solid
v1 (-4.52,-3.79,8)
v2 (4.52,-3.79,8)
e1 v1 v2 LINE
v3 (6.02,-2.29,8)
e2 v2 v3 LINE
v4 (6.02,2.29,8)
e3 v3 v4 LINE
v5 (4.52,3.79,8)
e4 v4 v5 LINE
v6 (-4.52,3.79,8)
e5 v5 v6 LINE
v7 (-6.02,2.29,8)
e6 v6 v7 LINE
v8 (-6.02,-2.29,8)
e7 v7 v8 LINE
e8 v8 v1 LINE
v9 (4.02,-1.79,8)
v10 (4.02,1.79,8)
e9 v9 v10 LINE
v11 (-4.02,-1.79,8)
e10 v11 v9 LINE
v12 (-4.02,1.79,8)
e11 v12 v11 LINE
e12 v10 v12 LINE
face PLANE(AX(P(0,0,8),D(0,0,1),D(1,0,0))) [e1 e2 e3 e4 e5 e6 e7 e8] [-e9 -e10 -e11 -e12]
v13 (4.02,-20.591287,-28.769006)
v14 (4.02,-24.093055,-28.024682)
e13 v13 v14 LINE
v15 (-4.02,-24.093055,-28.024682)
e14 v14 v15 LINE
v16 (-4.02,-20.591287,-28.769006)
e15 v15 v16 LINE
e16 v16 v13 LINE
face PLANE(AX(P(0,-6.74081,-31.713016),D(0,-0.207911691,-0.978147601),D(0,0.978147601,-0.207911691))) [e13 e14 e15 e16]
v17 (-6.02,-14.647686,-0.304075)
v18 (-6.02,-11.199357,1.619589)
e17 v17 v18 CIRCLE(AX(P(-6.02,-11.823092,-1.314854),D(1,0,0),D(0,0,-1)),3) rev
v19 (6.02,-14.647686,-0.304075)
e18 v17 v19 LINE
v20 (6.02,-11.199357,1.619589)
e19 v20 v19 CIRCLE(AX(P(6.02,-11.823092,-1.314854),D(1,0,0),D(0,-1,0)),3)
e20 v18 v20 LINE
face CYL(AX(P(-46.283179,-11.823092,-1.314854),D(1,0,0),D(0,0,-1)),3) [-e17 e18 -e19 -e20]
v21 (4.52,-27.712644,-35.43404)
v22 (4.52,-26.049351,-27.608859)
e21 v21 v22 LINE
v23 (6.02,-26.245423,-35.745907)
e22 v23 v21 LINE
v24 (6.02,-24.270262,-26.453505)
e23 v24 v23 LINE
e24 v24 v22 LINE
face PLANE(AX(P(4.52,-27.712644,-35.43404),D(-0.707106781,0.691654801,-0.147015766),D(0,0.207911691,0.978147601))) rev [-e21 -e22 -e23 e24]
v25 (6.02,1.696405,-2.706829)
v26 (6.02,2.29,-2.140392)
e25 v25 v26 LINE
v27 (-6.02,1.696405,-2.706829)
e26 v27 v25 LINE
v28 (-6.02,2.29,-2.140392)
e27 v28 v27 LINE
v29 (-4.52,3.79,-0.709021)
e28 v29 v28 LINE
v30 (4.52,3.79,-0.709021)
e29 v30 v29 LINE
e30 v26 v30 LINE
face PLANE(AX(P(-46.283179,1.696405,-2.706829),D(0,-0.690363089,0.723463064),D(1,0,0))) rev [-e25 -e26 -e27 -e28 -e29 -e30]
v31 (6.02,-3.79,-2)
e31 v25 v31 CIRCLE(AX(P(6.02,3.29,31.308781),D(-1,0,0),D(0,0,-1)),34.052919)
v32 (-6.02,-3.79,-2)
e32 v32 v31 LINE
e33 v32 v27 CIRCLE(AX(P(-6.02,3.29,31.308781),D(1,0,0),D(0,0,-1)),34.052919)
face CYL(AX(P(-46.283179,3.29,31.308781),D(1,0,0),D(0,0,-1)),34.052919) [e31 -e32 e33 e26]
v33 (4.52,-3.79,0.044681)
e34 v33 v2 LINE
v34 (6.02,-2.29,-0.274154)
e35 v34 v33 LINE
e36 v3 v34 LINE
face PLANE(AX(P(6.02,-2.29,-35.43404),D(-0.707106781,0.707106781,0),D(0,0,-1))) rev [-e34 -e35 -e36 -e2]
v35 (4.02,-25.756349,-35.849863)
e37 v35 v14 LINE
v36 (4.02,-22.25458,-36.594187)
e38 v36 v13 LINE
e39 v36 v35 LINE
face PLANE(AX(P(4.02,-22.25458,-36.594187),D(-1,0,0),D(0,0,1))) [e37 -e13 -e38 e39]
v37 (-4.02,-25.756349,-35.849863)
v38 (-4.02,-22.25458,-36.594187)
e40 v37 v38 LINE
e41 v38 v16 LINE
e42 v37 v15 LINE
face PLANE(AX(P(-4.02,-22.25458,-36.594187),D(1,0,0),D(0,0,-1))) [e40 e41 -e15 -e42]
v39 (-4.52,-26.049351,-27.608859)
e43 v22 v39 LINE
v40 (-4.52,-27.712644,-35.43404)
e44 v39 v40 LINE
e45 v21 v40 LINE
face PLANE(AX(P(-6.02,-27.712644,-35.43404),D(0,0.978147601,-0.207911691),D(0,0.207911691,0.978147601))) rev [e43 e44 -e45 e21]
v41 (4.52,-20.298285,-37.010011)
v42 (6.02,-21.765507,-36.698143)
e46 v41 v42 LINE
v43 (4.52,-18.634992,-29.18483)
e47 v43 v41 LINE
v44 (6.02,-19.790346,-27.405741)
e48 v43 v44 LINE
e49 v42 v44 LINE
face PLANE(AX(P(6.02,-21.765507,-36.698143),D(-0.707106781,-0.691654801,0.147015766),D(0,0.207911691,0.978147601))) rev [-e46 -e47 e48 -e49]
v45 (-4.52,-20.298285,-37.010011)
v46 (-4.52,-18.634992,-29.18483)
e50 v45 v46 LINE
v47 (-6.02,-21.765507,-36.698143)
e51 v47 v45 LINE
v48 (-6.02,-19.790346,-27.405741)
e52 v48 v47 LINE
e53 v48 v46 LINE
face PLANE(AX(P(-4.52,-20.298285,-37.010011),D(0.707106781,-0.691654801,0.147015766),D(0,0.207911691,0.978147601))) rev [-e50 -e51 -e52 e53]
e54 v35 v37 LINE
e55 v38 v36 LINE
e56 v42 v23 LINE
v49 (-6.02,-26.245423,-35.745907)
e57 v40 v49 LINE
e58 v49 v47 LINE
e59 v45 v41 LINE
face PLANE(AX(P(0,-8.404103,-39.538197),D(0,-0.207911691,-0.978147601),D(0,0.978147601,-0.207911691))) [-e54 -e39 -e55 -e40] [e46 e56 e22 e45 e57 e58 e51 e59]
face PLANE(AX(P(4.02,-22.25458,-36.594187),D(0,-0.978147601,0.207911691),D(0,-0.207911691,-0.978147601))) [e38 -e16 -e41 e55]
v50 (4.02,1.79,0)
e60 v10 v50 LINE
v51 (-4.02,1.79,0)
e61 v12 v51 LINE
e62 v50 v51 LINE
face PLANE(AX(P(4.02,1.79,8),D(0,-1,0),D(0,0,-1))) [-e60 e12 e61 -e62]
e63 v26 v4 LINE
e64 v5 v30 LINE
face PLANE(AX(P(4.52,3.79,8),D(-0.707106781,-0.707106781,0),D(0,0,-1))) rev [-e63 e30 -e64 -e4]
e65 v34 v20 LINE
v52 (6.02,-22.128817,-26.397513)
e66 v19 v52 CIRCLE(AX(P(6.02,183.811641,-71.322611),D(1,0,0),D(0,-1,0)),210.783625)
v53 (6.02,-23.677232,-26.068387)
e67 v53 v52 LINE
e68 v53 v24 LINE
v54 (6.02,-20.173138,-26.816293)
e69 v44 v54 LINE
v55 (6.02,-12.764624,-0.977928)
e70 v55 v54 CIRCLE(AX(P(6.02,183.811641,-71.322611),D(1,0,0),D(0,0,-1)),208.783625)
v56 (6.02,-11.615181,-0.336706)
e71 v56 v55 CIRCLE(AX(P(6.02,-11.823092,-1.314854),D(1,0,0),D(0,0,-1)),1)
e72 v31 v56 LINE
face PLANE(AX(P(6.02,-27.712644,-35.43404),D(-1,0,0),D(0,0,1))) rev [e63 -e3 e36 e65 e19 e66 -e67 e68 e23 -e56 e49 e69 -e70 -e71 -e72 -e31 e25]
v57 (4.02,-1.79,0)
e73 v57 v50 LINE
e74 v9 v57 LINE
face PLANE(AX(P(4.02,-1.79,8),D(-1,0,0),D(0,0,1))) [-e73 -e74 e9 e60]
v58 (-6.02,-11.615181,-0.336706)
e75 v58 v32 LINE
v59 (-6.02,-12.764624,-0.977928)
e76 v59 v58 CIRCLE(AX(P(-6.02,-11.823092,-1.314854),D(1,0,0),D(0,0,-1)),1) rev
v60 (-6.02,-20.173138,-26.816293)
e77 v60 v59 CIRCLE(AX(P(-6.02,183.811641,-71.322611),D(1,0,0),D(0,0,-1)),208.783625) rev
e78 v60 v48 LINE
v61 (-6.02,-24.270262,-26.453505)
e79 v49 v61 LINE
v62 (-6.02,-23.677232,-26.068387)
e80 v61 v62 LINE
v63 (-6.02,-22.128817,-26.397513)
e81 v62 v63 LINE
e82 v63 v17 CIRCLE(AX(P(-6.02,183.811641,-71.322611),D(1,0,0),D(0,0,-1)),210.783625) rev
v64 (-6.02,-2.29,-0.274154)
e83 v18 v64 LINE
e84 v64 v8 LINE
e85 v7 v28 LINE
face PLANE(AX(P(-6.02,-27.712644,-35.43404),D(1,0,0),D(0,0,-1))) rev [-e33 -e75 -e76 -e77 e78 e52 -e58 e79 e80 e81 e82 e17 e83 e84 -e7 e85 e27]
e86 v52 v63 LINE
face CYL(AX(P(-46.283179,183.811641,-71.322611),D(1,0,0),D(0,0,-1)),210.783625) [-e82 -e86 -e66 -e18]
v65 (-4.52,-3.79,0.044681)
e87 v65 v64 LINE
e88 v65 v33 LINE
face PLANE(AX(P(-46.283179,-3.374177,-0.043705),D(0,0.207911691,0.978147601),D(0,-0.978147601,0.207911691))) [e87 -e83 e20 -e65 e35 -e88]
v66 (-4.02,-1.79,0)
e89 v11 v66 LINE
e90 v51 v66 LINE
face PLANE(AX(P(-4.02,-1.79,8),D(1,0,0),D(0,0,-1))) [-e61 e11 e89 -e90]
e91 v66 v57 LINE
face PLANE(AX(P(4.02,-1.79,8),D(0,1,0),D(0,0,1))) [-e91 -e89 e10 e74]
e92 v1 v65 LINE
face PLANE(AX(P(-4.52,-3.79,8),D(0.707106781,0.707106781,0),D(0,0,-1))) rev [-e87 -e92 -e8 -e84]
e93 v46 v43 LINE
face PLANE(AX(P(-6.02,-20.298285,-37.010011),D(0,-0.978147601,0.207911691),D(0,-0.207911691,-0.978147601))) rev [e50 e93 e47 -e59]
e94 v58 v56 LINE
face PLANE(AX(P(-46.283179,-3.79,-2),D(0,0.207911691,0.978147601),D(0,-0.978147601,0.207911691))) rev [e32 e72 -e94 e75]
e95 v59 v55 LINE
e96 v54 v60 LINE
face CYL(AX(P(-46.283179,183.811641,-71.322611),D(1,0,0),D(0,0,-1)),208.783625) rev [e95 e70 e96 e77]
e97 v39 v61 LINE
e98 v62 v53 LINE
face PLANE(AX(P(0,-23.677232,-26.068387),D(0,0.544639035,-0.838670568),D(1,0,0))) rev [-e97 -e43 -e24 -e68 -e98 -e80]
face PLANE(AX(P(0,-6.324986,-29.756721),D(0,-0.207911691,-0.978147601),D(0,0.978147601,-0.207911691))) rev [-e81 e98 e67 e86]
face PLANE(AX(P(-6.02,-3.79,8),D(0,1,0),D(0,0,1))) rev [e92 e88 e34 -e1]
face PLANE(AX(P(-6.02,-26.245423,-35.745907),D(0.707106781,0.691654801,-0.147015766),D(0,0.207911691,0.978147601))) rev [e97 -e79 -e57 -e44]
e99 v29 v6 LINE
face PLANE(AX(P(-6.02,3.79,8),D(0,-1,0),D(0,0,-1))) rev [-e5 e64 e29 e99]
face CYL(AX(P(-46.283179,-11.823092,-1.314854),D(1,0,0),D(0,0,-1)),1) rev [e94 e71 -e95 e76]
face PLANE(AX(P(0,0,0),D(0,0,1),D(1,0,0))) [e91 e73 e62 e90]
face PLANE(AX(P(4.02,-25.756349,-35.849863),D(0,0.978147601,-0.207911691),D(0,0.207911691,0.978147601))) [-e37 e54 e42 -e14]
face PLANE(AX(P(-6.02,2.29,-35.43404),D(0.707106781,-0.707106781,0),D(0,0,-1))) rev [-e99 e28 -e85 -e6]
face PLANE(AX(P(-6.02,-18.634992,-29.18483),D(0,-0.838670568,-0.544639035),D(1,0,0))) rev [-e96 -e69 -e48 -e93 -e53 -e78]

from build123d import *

# Parameters (mm, degrees)
SKETCH1_W           = 12.04
SKETCH1_H           = 7.58
SKETCH1_W_2         = 8.04
SKETCH1_H_2         = 3.58
BOSS_EXTRUDE1_DEPTH = 8
SKETCH1_2_W         = 12.04
SKETCH1_2_H         = 7.58
SKETCH1_2_W_2       = 8.04
SKETCH1_2_H_2       = 3.58
BOSS_EXTRUDE2_DEPTH = 2
EXTRUDE_THIN1_DEPTH = 12.04
SKETCH5_W           = 12.04
SKETCH5_H           = 7.58
SKETCH5_W_2         = 8.04
SKETCH5_H_2         = 3.58
BOSS_EXTRUDE4_DEPTH = 8
SKETCH5_4_W         = 12.04
SKETCH5_4_H         = 7.58
BOSS_EXTRUDE5_DEPTH = 2
CHAMFER1_SIZE       = 1.5
CHAMFER2_START      = -7
CHAMFER2_DEPTH      = 14


with BuildPart() as part:
    # Sketch1 → Boss-Extrude1 (new body)
    with BuildSketch(Plane.XY):
        Rectangle(SKETCH1_W, SKETCH1_H)
        Rectangle(SKETCH1_W_2, SKETCH1_H_2, mode=Mode.SUBTRACT)
    extrude(amount=BOSS_EXTRUDE1_DEPTH)

    # Sketch1<2> → Boss-Extrude2 (add)
    # profile 1 of 2: a face of its own
    with BuildSketch(Plane.XY):
        Rectangle(SKETCH1_2_W, SKETCH1_2_H)
        Rectangle(SKETCH1_2_W_2, SKETCH1_2_H_2, mode=Mode.SUBTRACT)
    # profile 2 of 2: a face of its own
    with BuildSketch(Plane.XY):
        Rectangle(SKETCH1_2_W_2, SKETCH1_2_H_2)
    extrude(amount=-BOSS_EXTRUDE2_DEPTH)

    # Sketch3 → Extrude-Thin1 (add)
    with BuildSketch(Plane(origin=(6.02, 9.81, 0), x_dir=(0, -1, 0), z_dir=(1, 0, 0))):
        with BuildLine():
            Line((6.02, 2.744137986), (6.52, 2.744137986))
            ThreePointArc((6.52, 2.744137986), (10.07949931, 2.557592532), (13.6, 2))
            Line((13.6, 2), (21.425180806, 0.336706473))
            ThreePointArc((21.425180806, 0.336706473), (22.120268588, 0.441550315), (22.574623539, 0.977927827))
            ThreePointArc((22.574623539, 0.977927827), (26.849152106, 14.317688881), (30.219561316, 27.914054616))
            Line((30.219561316, 27.914054616), (30.401286915, 28.769006338))
            Line((30.401286915, 28.769006338), (32.357582116, 28.353182957))
            Line((32.357582116, 28.353182957), (32.175856518, 27.498231234))
            ThreePointArc((32.175856518, 27.498231234), (28.773161162, 13.771621897), (24.457685624, 0.304075332))
            ThreePointArc((24.457685624, 0.304075332), (23.094620772, -1.305057203), (21.009357424, -1.619588728))
            Line((21.009357424, -1.619588728), (13.184176618, 0.043704799))
            ThreePointArc((13.184176618, 0.043704799), (9.870442383, 0.568548741), (6.52, 0.744137986))
            Line((6.52, 0.744137986), (6.02, 0.744137986))
            Line((6.02, 0.744137986), (6.02, 2.744137986))
        make_face()
    extrude(amount=-EXTRUDE_THIN1_DEPTH)



with BuildPart() as body_2:
    # Sketch5 → Boss-Extrude4 (new body)
    with BuildSketch(Plane(origin=(0, 484.189145571, -136.063399466), x_dir=(1, 0, 0), z_dir=(0, -0.20791169081775487, -0.9781476007338067))):
        with Locations((0, 517.847527624)):
            Rectangle(SKETCH5_W, SKETCH5_H)
        with Locations((0, 517.847527624)):
            Rectangle(SKETCH5_W_2, SKETCH5_H_2, mode=Mode.SUBTRACT)
    extrude(amount=BOSS_EXTRUDE4_DEPTH)


with BuildPart() as part_1:
    add(part.part)

    add(body_2.part)  # Boss-Extrude5 merges body 2
    # Sketch5<4> → Boss-Extrude5 (add)
    with BuildSketch(Plane(origin=(0, 484.189145571, -136.063399466), x_dir=(1, 0, 0), z_dir=(0, -0.20791169081775487, -0.9781476007338067))):
        with Locations((0, 517.847527624)):
            Rectangle(SKETCH5_4_W, SKETCH5_4_H)
    extrude(amount=-BOSS_EXTRUDE5_DEPTH)

    # Chamfer1
    chamfer1_edges = [part_1.edges().sort_by_distance(p)[0] for p in [
        (6.02, -26.673085599, -30.543301906),
        (-6.02, -26.673085599, -30.543301906),
        (6.02, 3.79, 2.627931007),
        (6.02, -3.79, 4.022340595),
        (-6.02, -3.79, 4.022340595),
        (-6.02, 3.79, 2.627931007),
        (6.02, -19.258726786, -32.119272522),
        (-6.02, -19.258726786, -32.119272522),
    ]]
    chamfer(chamfer1_edges, length=CHAMFER1_SIZE)

    # Chamfer2: read off the stored shape, not the designer's step
    # Chamfer2 outline → Chamfer2 (cut)
    with BuildSketch(Plane.YZ.offset(CHAMFER2_START)):
        with BuildLine():
            Line((3.79, -2.744137986), (3.79, -0.709020541))
            Line((3.79, -0.709020541), (1.696404781, -2.706829325))
            ThreePointArc((1.696404781, -2.706829325), (2.492984056, -2.734809543), (3.29, -2.744137986))
            Line((3.29, -2.744137986), (3.79, -2.744137986))
        make_face()
        Polygon((-25.633527145, -25.652563902), (-26.049350527, -27.608859104), (-23.677231944, -26.068387284), align=None)
        with BuildLine():
            ThreePointArc((-20.172493797, -26.813342374), (-20.172815684, -26.814817596), (-20.173137561, -26.81629282))
            Line((-20.173137561, -26.81629282), (-18.634991713, -29.18482972))
            Line((-18.634991713, -29.18482972), (-18.219168332, -27.228534519))
            Line((-18.219168332, -27.228534519), (-20.172493797, -26.813342374))
        make_face()
    extrude(amount=CHAMFER2_DEPTH, mode=Mode.SUBTRACT)


solid = part_1.part
